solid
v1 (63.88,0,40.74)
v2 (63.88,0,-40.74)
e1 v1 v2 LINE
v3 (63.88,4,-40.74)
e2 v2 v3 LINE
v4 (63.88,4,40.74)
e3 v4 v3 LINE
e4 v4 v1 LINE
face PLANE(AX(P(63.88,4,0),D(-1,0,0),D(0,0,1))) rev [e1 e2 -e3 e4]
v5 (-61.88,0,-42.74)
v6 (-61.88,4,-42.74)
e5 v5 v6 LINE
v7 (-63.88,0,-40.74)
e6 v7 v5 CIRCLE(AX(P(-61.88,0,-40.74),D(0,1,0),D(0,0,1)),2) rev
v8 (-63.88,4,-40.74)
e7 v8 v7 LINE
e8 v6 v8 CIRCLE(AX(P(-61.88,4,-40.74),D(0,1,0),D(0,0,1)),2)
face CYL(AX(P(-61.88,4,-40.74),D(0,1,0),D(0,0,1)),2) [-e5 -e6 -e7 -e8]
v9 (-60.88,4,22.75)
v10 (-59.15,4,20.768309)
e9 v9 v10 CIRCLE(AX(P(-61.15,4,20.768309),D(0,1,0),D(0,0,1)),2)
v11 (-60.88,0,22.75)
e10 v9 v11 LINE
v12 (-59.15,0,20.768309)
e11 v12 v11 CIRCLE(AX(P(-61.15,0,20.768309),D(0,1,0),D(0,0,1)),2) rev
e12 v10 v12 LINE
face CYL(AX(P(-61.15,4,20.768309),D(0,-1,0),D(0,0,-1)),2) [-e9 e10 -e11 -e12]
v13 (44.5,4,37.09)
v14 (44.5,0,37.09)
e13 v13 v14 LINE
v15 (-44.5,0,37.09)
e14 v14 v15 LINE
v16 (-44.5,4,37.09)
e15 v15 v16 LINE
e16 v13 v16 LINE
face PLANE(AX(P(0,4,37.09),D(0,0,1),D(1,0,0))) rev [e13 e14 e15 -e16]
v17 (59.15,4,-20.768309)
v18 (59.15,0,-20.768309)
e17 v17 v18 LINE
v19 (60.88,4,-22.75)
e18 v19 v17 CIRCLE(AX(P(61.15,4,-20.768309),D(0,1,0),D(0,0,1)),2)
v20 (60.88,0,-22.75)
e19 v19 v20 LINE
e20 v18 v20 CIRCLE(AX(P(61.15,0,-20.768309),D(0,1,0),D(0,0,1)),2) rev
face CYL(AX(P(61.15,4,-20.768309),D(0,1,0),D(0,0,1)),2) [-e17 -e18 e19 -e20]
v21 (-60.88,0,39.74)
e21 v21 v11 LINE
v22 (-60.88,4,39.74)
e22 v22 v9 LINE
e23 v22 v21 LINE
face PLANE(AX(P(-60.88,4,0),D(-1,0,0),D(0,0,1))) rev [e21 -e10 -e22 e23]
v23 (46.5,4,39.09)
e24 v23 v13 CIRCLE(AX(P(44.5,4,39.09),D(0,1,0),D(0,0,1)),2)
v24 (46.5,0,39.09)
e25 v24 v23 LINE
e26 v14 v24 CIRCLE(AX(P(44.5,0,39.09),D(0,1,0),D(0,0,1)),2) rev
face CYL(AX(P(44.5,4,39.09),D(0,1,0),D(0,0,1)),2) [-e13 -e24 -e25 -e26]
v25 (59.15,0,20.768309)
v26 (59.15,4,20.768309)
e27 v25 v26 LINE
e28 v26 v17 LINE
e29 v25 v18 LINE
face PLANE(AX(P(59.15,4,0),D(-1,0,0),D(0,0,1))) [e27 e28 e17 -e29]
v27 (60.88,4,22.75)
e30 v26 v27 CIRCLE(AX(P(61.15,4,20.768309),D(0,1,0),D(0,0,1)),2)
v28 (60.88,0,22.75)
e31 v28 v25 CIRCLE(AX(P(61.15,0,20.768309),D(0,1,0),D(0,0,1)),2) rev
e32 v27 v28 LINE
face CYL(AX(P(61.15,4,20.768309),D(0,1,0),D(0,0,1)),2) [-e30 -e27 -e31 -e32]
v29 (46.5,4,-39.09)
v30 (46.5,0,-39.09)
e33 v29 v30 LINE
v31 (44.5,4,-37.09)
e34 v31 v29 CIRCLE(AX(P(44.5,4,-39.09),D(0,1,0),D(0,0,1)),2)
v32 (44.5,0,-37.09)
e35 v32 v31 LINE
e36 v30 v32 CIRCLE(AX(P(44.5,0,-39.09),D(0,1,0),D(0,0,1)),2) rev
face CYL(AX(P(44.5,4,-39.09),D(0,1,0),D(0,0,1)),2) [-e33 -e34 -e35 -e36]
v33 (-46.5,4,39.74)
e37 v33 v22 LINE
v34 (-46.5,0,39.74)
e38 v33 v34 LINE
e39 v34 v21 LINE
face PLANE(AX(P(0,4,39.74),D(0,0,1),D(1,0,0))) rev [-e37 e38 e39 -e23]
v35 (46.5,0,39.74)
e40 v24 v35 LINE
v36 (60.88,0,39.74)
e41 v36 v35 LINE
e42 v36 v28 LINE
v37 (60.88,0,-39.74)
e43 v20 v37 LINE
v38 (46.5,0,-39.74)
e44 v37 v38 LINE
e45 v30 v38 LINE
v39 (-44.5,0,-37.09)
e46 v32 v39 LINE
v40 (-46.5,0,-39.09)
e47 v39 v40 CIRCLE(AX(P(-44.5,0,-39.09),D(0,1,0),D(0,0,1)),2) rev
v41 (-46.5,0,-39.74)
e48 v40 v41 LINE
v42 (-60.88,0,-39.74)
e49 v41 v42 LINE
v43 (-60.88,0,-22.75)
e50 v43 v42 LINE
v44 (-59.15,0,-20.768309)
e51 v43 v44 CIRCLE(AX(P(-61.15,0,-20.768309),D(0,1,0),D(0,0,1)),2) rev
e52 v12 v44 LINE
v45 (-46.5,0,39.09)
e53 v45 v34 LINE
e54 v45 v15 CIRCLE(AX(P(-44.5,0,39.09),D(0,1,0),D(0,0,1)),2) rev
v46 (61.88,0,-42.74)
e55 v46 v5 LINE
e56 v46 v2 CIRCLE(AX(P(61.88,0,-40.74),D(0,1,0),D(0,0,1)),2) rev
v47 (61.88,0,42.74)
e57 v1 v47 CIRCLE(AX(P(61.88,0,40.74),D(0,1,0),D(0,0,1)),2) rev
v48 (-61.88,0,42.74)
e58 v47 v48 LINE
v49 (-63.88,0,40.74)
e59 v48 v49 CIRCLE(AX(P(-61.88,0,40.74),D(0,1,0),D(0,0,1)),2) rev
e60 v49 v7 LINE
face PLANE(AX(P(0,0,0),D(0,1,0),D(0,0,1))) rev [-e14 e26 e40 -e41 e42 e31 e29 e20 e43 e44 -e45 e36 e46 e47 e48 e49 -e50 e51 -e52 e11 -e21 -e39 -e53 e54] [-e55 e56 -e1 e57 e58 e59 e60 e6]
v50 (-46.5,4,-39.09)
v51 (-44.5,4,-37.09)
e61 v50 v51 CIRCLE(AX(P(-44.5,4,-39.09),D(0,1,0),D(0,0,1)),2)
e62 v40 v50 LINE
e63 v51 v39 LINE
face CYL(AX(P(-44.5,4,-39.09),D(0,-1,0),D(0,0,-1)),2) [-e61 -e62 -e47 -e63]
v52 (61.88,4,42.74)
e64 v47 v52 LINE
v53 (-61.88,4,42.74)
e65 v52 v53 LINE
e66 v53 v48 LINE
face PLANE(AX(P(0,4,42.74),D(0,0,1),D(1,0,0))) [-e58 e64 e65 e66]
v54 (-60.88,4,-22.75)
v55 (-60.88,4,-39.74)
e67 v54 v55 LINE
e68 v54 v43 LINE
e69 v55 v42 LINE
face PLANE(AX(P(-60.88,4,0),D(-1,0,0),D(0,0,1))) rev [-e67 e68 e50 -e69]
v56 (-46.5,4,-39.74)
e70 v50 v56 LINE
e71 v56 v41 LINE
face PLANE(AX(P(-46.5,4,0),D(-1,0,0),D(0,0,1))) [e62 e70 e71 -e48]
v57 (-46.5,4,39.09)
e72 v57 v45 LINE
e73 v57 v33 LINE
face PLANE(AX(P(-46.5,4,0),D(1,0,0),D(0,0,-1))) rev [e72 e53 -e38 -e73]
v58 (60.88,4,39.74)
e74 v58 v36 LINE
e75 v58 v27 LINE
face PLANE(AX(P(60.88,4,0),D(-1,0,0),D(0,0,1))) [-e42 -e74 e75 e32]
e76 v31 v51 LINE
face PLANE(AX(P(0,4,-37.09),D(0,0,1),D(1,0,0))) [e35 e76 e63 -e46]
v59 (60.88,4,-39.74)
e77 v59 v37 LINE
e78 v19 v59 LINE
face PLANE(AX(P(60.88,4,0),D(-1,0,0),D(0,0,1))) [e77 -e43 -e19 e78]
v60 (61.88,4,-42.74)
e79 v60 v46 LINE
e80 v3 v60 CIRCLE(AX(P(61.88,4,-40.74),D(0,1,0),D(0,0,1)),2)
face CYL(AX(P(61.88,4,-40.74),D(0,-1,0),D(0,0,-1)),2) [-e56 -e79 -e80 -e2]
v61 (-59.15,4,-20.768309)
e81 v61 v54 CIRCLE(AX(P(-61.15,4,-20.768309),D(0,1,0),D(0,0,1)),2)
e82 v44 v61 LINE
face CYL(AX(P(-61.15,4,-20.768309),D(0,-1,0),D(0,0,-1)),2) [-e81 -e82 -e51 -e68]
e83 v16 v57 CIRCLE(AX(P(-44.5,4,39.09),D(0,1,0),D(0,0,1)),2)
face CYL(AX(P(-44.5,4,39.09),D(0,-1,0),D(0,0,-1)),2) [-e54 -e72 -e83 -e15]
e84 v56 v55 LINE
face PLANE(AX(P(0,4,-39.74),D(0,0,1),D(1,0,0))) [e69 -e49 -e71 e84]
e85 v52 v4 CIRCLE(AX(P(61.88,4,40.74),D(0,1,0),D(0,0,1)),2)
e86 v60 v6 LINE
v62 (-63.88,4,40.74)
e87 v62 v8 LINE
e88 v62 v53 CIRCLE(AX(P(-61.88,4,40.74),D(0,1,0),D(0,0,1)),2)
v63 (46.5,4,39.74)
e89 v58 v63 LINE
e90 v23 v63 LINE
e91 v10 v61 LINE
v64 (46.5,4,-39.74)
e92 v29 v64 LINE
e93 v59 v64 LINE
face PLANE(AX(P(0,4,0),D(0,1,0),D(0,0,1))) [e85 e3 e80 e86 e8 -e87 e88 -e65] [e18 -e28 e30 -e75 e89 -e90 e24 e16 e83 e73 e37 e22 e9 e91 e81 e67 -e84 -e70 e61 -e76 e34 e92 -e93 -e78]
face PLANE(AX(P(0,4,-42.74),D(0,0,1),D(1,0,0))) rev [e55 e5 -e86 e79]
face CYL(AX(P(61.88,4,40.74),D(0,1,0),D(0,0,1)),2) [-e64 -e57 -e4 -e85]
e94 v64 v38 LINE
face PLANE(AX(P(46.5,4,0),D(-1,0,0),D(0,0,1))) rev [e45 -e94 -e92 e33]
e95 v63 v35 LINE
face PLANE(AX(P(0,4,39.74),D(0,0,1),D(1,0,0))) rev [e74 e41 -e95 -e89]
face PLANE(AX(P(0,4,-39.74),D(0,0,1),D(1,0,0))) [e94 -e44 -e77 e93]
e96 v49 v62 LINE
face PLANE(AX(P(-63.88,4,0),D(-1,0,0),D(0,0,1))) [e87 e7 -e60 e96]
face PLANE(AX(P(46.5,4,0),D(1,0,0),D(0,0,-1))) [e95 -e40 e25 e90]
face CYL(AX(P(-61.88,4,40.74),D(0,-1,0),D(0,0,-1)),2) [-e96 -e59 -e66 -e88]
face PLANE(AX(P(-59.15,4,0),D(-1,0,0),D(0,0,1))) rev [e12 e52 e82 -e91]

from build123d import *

# Parameters (mm, degrees)
SKETCH2_W           = 127.76
SKETCH2_H           = 85.48
SKETCH2_W_2         = 121.76
SKETCH2_H_2         = 79.48
SKETCH2_W_3         = 1.73
SKETCH2_H_3         = 45.5
SKETCH2_W_4         = 93
SKETCH2_H_4         = 2.65
BOSS_EXTRUDE1_DEPTH = 4
FILLET1_R           = 2


with BuildPart() as part:
    # Sketch2 → Boss-Extrude1 (new body)
    # profile 1 of 5: a face of its own
    with BuildSketch(Plane(origin=(0, 0, 0), x_dir=(1, 0, 0), z_dir=(0, 1, 0))):
        Rectangle(SKETCH2_W, SKETCH2_H)
        Rectangle(SKETCH2_W_2, SKETCH2_H_2, mode=Mode.SUBTRACT)
    # profile 2 of 5: a face of its own
    with BuildSketch(Plane(origin=(0, 0, 0), x_dir=(1, 0, 0), z_dir=(0, 1, 0))):
        with Locations((-60.015, 0)):
            Rectangle(SKETCH2_W_3, SKETCH2_H_3)
    # profile 3 of 5: a face of its own
    with BuildSketch(Plane(origin=(0, 0, 0), x_dir=(1, 0, 0), z_dir=(0, 1, 0))):
        with Locations((0, 38.415)):
            Rectangle(SKETCH2_W_4, SKETCH2_H_4)
    # profile 4 of 5: a face of its own
    with BuildSketch(Plane(origin=(0, 0, 0), x_dir=(1, 0, 0), z_dir=(0, 1, 0))):
        with Locations((60.015, 0)):
            Rectangle(SKETCH2_W_3, SKETCH2_H_3)
    # profile 5 of 5: a face of its own
    with BuildSketch(Plane(origin=(0, 0, 0), x_dir=(1, 0, 0), z_dir=(0, 1, 0))):
        with Locations((0, -38.415)):
            Rectangle(SKETCH2_W_4, SKETCH2_H_4)
    extrude(amount=BOSS_EXTRUDE1_DEPTH)

    # Fillet1
    # the kernel refuses this fillet: 2 mm, written as the material it takes off along each edge
    with BuildSketch(Plane(origin=(46.5, -5, 37.09), x_dir=(0, 0, 1), z_dir=(0, 1, 0)), Plane(origin=(-46.5, -5, 37.09), x_dir=(1, 0, 0), z_dir=(0, 1, 0)), Plane(origin=(-63.88, -5, 42.74), x_dir=(0, 0, -1), z_dir=(0, 1, 0)), Plane(origin=(63.88, -5, 42.74), x_dir=(-1, 0, 0), z_dir=(0, 1, 0))) as fillet1_piece_1:
        with BuildLine():
            CenterArc((FILLET1_R, -FILLET1_R), FILLET1_R, 90, 90)
            Line((0, -FILLET1_R), (-FILLET1_R * 0.02, -FILLET1_R))
            Line((-FILLET1_R * 0.02, -FILLET1_R), (-FILLET1_R * 0.02, FILLET1_R * 0.02))
            Line((-FILLET1_R * 0.02, FILLET1_R * 0.02), (FILLET1_R, FILLET1_R * 0.02))
            Line((FILLET1_R, FILLET1_R * 0.02), (FILLET1_R, 0))
        make_face()
    extrude(amount=14, mode=Mode.SUBTRACT)
    with BuildSketch(Plane(origin=(59.15, -4.954227992, 22.75), x_dir=(1, 0, 0), z_dir=(0, 1, 0)), Plane(origin=(-59.15, -4.954227992, -22.75), x_dir=(-1, 0, 0), z_dir=(0, 1, 0))) as fillet1_piece_2:
        with BuildLine():
            CenterArc((2, 1.981691197), FILLET1_R, 180, 82.241380111)
            Line((0, 1.981691197), (-0.04, 1.981691197))
            Line((-0.04, 1.981691197), (-0.04, 0))
            Line((-0.04, 0), (0, -0.04))
            ThreePointArc((0, -0.04), (0.865, -0.04), (1.7246, -0.039633824))
            Line((1.7246, -0.039633824), (1.73, 0))
        make_face()
    extrude(amount=13.908455985, mode=Mode.SUBTRACT)
    with BuildSketch(Plane(origin=(59.15, -4.954227992, -22.75), x_dir=(0, 0, 1), z_dir=(0, 1, 0)), Plane(origin=(-59.15, -4.954227992, 22.75), x_dir=(0, 0, -1), z_dir=(0, 1, 0))) as fillet1_piece_3:
        with BuildLine():
            CenterArc((1.981691197, 2), FILLET1_R, 187.758619889, 82.241380111)
            Line((0, 1.73), (-0.039633824, 1.7246))
            ThreePointArc((-0.039633824, 1.7246), (-0.04, 0.865), (-0.04, 0))
            Line((-0.04, 0), (0, -0.04))
            Line((0, -0.04), (1.981691197, -0.04))
            Line((1.981691197, -0.04), (1.981691197, 0))
        make_face()
    extrude(amount=13.908455985, mode=Mode.SUBTRACT)
    with BuildSketch(Plane(origin=(46.5, -5, -37.09), x_dir=(0, 0, -1), z_dir=(0, 1, 0)), Plane(origin=(-46.5, -5, -37.09), x_dir=(1, 0, 0), z_dir=(0, 1, 0)), Plane(origin=(-63.88, -5, -42.74), x_dir=(0, 0, 1), z_dir=(0, 1, 0)), Plane(origin=(63.88, -5, -42.74), x_dir=(-1, 0, 0), z_dir=(0, 1, 0))) as fillet1_piece_4:
        with BuildLine():
            CenterArc((FILLET1_R, FILLET1_R), FILLET1_R, 180, 90)
            Line((0, FILLET1_R), (-FILLET1_R * 0.02, FILLET1_R))
            Line((-FILLET1_R * 0.02, FILLET1_R), (-FILLET1_R * 0.02, -FILLET1_R * 0.02))
            Line((-FILLET1_R * 0.02, -FILLET1_R * 0.02), (FILLET1_R, -FILLET1_R * 0.02))
            Line((FILLET1_R, -FILLET1_R * 0.02), (FILLET1_R, 0))
        make_face()
    extrude(amount=14, mode=Mode.SUBTRACT)


solid = part.part
